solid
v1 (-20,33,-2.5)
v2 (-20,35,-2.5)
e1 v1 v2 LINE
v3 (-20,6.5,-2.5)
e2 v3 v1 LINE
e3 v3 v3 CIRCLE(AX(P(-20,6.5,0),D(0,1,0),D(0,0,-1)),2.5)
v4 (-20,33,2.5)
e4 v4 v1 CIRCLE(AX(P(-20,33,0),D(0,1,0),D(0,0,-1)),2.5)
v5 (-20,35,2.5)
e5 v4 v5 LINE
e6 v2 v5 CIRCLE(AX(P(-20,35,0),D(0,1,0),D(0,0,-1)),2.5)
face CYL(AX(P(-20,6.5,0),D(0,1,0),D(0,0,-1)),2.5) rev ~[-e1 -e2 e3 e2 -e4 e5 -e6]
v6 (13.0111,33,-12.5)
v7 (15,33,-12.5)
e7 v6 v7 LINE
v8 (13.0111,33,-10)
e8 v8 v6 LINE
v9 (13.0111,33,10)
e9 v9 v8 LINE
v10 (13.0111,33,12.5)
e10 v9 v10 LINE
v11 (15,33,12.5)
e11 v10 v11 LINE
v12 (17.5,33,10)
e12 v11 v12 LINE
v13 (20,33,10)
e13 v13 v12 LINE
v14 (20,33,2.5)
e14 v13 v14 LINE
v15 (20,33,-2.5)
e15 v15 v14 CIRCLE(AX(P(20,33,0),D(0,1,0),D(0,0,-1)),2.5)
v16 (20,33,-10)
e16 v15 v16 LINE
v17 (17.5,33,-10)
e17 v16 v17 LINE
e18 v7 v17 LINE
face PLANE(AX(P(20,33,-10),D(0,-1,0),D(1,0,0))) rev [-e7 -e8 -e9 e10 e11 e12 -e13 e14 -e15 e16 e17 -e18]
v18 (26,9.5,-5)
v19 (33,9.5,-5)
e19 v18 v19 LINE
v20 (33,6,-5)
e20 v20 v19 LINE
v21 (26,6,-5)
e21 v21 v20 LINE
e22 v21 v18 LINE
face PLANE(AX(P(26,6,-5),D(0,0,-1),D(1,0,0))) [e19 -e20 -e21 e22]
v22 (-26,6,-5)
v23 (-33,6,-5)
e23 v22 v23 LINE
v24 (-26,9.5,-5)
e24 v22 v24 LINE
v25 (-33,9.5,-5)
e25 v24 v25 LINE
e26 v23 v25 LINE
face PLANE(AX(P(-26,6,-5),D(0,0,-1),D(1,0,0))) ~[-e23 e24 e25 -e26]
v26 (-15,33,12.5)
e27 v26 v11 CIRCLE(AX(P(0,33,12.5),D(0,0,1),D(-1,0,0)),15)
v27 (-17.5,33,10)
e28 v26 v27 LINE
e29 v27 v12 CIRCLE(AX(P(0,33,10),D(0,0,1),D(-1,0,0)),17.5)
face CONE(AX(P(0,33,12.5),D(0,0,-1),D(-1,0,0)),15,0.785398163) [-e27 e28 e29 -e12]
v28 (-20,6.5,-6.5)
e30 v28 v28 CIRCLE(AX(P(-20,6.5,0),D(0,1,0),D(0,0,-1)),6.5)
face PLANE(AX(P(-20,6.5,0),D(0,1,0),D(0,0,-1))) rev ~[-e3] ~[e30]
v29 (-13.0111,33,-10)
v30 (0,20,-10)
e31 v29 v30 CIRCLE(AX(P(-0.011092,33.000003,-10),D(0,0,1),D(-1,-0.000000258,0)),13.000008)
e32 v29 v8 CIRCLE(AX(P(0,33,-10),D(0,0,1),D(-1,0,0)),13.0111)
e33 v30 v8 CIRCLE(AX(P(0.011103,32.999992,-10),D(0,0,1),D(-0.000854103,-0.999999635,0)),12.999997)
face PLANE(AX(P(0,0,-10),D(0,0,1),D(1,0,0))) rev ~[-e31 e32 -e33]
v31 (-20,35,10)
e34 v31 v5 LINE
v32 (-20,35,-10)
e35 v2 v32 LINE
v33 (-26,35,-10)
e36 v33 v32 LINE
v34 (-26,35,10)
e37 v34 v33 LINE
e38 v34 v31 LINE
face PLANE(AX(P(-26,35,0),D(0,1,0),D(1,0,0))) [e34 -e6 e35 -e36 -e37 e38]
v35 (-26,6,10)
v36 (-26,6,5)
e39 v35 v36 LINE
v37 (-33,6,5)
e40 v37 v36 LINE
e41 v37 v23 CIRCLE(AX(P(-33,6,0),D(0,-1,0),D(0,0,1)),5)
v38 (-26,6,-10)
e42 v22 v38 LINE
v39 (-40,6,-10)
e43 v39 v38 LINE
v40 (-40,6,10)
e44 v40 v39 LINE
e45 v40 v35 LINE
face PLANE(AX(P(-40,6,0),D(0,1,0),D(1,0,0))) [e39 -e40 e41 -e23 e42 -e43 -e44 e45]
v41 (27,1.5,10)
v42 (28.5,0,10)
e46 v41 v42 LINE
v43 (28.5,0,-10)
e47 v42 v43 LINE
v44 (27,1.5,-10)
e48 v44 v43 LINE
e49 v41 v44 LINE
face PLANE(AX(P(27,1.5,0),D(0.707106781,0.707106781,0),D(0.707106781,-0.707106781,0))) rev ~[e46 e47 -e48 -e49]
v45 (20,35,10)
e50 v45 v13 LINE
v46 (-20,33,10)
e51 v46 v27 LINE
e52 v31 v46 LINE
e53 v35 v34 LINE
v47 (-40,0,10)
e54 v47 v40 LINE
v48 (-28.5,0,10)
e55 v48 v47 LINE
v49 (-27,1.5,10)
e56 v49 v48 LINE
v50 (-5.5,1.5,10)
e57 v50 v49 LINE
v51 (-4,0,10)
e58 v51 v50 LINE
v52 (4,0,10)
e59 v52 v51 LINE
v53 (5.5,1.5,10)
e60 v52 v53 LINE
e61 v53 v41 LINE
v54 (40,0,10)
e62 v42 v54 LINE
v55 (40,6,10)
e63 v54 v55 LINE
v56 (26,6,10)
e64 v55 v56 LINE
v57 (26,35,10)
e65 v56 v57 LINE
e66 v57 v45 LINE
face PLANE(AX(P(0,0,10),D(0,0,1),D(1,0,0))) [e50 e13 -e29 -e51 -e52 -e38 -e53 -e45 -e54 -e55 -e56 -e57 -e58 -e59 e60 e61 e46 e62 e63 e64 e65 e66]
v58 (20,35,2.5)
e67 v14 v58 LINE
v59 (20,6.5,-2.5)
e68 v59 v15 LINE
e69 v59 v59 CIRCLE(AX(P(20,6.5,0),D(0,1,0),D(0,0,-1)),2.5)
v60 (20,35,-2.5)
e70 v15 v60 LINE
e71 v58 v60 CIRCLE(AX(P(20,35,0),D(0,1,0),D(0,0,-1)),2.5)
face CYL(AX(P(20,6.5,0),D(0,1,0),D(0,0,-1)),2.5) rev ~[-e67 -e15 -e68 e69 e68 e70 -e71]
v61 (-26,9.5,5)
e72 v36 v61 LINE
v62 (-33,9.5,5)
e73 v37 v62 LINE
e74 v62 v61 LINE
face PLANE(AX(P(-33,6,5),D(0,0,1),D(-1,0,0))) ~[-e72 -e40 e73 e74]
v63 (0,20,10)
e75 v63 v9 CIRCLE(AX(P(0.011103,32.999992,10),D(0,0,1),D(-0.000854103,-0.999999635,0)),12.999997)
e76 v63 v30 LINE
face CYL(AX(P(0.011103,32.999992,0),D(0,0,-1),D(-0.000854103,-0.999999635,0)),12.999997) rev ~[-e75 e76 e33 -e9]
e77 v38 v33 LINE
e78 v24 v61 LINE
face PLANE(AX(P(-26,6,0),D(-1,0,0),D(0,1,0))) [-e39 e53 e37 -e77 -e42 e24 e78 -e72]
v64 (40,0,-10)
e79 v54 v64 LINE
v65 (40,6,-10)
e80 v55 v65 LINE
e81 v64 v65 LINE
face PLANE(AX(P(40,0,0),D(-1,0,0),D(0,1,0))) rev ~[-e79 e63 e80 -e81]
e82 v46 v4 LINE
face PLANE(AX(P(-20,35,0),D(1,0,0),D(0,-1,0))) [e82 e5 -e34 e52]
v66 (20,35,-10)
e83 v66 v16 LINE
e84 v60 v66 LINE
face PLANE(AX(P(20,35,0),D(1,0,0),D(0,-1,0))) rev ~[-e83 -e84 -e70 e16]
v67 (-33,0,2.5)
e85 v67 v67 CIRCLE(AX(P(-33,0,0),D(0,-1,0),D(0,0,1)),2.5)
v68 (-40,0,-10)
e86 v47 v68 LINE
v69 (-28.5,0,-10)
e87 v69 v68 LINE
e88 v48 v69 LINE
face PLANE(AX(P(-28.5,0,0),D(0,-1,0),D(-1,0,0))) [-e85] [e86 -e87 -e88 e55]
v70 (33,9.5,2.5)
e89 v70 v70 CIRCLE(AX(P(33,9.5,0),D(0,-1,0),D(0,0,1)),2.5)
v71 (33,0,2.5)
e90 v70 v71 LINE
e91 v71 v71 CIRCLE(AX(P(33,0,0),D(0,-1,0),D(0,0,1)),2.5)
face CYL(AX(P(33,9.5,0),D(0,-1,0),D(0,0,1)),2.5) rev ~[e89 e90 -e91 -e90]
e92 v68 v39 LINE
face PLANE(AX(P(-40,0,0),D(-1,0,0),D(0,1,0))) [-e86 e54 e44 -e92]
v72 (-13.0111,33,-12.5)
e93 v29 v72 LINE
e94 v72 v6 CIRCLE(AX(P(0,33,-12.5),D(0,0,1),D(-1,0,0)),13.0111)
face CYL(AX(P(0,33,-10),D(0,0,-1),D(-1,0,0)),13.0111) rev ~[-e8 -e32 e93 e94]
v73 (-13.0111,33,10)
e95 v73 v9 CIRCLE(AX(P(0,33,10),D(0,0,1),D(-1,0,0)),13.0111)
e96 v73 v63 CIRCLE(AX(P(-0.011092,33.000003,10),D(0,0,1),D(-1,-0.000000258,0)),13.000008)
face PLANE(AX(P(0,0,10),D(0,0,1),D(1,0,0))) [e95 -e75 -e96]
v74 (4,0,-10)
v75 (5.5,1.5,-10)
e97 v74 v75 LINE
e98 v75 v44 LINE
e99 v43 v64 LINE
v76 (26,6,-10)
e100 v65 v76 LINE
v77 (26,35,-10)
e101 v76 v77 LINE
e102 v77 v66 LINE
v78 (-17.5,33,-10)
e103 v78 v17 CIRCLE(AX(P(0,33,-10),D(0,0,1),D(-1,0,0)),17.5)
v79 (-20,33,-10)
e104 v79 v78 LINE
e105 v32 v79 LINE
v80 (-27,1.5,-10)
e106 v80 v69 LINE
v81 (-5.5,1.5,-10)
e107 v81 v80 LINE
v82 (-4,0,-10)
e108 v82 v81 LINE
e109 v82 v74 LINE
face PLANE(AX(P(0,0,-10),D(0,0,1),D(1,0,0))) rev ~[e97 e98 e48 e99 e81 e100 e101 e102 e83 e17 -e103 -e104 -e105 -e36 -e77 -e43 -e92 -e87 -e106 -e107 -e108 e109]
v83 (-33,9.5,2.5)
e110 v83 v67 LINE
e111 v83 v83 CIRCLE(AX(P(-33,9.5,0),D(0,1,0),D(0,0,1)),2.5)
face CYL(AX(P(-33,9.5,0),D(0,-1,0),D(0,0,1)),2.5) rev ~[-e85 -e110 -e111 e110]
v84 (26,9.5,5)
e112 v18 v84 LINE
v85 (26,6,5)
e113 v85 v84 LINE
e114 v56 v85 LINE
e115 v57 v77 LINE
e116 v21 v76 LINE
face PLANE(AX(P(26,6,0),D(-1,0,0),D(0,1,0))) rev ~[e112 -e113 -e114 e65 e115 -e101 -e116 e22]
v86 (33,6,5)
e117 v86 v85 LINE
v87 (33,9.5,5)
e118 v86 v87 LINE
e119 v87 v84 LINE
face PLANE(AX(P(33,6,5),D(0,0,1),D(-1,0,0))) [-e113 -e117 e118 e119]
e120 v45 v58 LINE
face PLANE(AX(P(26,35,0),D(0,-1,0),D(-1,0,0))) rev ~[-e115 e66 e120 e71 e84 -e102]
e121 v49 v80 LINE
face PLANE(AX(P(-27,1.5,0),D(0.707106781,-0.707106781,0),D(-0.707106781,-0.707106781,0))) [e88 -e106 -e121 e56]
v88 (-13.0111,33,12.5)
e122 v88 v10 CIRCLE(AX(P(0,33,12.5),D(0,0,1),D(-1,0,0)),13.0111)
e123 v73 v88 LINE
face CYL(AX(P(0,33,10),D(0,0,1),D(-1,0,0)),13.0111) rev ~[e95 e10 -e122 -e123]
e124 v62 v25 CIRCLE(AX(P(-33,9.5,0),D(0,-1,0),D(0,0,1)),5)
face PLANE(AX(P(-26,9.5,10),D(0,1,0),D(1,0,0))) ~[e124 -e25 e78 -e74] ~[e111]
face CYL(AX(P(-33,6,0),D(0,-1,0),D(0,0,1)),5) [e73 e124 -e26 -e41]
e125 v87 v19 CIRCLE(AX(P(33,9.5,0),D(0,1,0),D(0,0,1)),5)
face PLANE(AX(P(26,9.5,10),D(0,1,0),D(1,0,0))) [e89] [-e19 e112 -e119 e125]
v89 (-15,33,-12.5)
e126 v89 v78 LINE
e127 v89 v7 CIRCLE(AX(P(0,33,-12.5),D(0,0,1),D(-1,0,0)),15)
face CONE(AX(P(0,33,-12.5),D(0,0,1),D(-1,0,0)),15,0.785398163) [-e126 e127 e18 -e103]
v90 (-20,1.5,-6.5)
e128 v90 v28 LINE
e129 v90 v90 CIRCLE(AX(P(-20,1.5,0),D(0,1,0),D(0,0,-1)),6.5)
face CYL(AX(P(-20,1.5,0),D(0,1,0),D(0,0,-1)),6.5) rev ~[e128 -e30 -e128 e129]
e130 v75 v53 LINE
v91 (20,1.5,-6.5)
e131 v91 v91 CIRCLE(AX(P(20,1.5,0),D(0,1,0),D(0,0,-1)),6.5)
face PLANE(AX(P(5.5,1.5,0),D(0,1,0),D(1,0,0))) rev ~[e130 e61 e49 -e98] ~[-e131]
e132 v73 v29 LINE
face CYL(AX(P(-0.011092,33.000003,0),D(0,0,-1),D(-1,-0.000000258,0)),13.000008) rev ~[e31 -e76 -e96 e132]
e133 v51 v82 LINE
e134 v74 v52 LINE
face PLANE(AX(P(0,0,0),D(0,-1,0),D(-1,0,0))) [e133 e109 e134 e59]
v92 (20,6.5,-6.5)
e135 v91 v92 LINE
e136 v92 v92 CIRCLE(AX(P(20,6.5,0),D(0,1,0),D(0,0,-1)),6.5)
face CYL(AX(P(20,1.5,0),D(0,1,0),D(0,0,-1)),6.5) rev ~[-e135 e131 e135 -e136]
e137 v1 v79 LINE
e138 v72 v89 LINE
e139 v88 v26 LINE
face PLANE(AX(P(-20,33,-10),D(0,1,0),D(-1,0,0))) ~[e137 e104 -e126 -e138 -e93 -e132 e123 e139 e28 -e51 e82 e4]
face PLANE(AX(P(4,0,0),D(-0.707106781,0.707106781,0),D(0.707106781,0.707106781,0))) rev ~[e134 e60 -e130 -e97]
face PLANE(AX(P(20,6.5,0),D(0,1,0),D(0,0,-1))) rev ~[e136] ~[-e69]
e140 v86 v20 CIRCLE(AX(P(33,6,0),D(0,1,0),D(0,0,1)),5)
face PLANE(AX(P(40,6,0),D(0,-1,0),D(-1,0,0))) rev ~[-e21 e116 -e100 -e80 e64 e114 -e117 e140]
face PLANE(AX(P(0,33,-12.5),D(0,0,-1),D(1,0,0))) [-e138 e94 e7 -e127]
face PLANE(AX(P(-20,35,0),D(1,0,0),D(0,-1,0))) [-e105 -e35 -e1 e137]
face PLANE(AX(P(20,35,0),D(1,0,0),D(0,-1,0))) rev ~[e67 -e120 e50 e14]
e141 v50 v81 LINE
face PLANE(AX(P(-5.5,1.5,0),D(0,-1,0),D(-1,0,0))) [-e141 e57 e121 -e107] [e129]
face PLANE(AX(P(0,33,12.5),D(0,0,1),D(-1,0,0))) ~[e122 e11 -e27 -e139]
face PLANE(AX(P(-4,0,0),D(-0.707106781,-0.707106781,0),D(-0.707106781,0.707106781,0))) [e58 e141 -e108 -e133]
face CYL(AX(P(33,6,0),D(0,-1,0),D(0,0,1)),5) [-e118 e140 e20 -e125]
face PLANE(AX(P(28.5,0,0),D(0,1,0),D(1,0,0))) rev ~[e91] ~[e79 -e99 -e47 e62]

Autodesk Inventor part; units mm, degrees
ref_plane "YZ Plane" through (0, 0, 0) normal (1, 0, 0) x (0, 1, 0)
ref_plane "XZ Plane" through (0, 0, 0) normal (0, 1, 0) x (-1, 0, 0)
ref_plane "XY Plane" through (0, 0, 0) normal (0, 0, 1) x (1, 0, 0)
sketch "Sketch1" plane through (0, 0, 0) normal (0, 0, 1) x (1, 0, 0)
  line L0 (0, 0) -> (0, 35) construction
  line L1 (0, 0) -> (-4, 0)
  line L2 (-4, 0) -> (-5.5, 1.5)
  line L3 (-5.5, 1.5) -> (-27, 1.5)
  line L4 (-27, 1.5) -> (-28.5, 0)
  line L5 (-28.5, 0) -> (-40, 0)
  line L6 (-40, 0) -> (-40, 6)
  line L7 (-40, 6) -> (-26, 6)
  line L8 (-26, 6) -> (-26, 35)
  line L9 (-26, 35) -> (-20, 35)
  line L10 (-20, 35) -> (-20, 33)
  line L11 (-20, 33) -> (-13.0111, 33)
  arc A0 (-13.0111, 33) -> (0, 20) centre (-0.0111, 33) ccw
  line L12 (0, 0) -> (4, 0)
  line L13 (4, 0) -> (5.5, 1.5)
  line L14 (5.5, 1.5) -> (27, 1.5)
  line L15 (27, 1.5) -> (28.5, 0)
  line L16 (28.5, 0) -> (40, 0)
  line L17 (40, 0) -> (40, 6)
  line L18 (40, 6) -> (26, 6)
  line L19 (26, 6) -> (26, 35)
  line L20 (26, 35) -> (20, 35)
  line L21 (20, 35) -> (20, 33)
  line L22 (20, 33) -> (13.0111, 33)
  arc A1 (0, 20) -> (13.0111, 33) centre (0.0111, 33) ccw
  dimension "d0" = 35
  dimension "d1" = 45
  dimension "d2" = 45
  dimension "d3" = 24.5
  dimension "d4" = 1.5
  dimension "d5" = 8
  dimension "d6" = 6
  dimension "d7" = 13
  dimension "d8" = 40
  dimension "d9" = 52
  dimension "d10" = 2
  dimension "d11" = 80
  dimension "d12" = 26.9889
extrude "Extrusion1" add sketch "Sketch1" along normal mid plane 20
sketch "Sketch2" plane through (26, 6, 10) normal (0, 1, 0) x (1, 0, 0)
  line L0 (0, 20) -> (0, 0) projected
  line L1 (0, 20) -> (0, 0) projected
  line L2 (0, 15) -> (7, 15)
  arc A0 (7, 5) -> (7, 15) centre (7, 10) ccw
  line L3 (7, 5) -> (0, 5)
  line L4 (-26, 20) -> (-26, 0) projected
  point P0 (-26, 10)
  point P1 (-26, 10)
  point P2 (-26, 10)
  dimension "d15" = 5
  dimension "d16" = 33
extrude "Extrusion2" add sketch "Sketch2" along normal blind 3.5
sketch "Sketch3" plane through (26, 9.5, 10) normal (0, 1, 0) x (1, 0, 0)
  arc A0 (7, 5) -> (7, 15) centre (7, 10) ccw projected
  point P0 (-26, 10)
hole "Hole1" at (33, 9.5, 0) direction (0, -1, 0) diameter 5 end through all
mirror "Mirror1" about plane through (0, 0, 0) normal (1, 0, 0) of "Extrusion2", "Hole1"
sketch "Sketch4" plane through (-20, 33, 10) normal (0, 1, 0) x (1, 0, 0)
  line L0 (6.9889, 0) -> (0, 0) projected
  line L1 (6.9889, 0) -> (6.9889, -2.5)
  line L2 (6.9889, -2.5) -> (5, -2.5)
  line L3 (5, -2.5) -> (2.5, 0)
  line L4 (20, 24.7399) -> (20, -8.4394) projected
  point P0 (20, 10)
  dimension "d26" = 30
  dimension "d27" = 45
  dimension "d28" = 12.5
revolve "Revolution1" add sketch "Sketch4" angle 180 about axis through (0, 33, -10) along (0, 0, 1)
mirror "Mirror2" about plane through (0, 0, 0) normal (0, 0, 1) of "Revolution1"
sketch "Sketch5" plane through (-27, 1.5, 10) normal (0, -1, 0) x (1, 0, 0)
  line L0 (47, -10) -> (7, -10) construction
  point P0 (27, -10)
  point P1 (27, -10)
  dimension "d30" = 40
hole "Hole2" at (20, 1.5, 0) at (-20, 1.5, 0) direction (0, 1, 0) diameter 5 end through all counterbore diameter 13 counterbore depth 5
properties part number "Part039. Lower halg bearing" material "Steel, Carbon"
